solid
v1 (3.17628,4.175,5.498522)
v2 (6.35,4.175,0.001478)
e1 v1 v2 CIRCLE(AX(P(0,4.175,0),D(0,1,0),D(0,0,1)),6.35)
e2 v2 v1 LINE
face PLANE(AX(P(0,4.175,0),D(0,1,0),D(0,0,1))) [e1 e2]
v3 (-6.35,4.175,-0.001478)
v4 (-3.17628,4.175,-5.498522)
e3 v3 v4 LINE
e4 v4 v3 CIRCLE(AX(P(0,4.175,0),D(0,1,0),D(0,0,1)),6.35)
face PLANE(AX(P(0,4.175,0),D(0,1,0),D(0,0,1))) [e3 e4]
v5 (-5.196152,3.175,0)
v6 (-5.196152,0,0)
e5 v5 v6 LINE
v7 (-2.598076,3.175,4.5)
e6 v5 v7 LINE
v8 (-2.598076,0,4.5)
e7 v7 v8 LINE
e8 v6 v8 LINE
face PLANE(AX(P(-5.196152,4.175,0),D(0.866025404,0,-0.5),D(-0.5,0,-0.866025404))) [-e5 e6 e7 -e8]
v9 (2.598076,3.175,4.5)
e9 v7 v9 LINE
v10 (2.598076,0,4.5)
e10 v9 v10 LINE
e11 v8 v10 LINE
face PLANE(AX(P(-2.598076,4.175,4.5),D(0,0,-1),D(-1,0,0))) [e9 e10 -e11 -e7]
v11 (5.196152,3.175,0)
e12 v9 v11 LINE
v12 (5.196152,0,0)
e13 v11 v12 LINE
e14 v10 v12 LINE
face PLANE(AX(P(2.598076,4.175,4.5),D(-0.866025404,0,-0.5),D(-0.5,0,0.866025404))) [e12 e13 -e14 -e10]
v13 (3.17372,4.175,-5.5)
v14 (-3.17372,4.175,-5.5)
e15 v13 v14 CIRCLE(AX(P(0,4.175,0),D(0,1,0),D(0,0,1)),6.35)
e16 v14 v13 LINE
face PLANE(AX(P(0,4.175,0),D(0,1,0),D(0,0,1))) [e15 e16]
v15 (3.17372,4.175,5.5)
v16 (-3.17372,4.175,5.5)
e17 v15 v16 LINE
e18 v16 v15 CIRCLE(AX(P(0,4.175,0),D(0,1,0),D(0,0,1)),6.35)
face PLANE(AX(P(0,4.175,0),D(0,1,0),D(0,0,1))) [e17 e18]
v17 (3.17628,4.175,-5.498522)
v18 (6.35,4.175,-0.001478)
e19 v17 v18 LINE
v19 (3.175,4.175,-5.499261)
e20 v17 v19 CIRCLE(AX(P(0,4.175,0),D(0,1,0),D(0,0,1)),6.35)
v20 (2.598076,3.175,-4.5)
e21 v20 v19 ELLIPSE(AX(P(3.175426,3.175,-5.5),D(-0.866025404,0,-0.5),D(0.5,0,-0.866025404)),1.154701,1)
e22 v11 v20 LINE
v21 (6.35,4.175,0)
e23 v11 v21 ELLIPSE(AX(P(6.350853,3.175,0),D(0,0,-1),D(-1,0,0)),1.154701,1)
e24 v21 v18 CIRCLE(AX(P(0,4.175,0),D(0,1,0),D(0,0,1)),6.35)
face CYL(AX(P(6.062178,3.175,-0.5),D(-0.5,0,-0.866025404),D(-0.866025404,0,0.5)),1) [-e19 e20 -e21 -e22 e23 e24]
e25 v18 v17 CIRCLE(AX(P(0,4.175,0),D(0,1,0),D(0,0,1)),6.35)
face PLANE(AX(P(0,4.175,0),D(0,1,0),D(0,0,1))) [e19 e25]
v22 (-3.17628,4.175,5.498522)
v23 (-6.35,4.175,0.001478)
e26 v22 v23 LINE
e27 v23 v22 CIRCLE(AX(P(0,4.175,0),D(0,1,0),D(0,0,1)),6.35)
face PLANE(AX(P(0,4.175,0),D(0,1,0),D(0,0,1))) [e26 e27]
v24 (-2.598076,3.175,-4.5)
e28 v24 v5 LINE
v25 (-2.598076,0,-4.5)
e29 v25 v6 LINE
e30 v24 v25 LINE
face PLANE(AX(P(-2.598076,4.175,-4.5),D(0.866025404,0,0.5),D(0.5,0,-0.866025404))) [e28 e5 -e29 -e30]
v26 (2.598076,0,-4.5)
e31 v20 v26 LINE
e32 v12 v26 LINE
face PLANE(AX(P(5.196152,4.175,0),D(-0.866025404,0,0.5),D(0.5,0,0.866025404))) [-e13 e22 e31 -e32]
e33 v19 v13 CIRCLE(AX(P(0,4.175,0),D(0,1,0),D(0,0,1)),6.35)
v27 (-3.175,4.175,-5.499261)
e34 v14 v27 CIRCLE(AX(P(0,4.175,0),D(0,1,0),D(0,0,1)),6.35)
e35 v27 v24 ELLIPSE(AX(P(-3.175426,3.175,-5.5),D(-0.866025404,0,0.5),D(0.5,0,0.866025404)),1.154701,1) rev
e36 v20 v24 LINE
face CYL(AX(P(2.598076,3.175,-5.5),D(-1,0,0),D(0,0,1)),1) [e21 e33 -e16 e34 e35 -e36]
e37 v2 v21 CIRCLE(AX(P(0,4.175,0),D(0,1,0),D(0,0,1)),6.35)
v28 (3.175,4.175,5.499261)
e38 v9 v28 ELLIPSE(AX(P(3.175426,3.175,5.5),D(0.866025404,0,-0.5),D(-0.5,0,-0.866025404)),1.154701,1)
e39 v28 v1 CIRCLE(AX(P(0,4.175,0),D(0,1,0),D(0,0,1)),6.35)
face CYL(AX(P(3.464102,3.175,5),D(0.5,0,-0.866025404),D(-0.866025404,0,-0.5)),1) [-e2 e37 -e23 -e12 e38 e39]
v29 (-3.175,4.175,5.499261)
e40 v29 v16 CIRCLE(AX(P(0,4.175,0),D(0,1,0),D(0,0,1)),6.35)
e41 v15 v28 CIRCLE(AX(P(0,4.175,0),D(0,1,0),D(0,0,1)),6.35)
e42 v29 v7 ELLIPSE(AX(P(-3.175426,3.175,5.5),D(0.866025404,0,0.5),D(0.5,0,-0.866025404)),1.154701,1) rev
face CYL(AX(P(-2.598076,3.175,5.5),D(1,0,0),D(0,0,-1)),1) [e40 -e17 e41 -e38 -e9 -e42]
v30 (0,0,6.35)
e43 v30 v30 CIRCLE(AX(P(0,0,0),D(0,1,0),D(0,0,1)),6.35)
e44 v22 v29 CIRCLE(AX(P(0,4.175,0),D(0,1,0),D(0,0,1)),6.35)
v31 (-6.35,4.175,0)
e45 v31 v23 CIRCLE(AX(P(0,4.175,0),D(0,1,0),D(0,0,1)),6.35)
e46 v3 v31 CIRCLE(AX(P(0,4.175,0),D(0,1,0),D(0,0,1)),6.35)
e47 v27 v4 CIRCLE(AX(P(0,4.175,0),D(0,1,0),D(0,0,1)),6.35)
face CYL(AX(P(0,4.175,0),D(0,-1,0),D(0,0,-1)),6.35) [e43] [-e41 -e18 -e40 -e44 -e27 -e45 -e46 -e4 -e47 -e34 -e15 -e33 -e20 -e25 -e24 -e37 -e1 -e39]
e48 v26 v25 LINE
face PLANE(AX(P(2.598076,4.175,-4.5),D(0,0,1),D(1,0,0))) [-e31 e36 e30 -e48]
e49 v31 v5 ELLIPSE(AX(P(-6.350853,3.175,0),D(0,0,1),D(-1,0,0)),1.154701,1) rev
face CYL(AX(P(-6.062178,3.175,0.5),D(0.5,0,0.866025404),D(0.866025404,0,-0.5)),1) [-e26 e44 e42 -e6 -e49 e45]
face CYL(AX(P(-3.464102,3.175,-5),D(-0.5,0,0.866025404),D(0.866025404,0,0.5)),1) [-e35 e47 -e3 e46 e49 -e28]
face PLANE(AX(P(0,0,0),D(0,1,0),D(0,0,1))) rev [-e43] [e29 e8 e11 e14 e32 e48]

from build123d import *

# Parameters (mm, degrees)
SKETCH1_R           = 6.35
BOSS_EXTRUDE1_DEPTH = 4.175
FILLET1_R           = 1


with BuildPart() as part:
    # Sketch1 → Boss-Extrude1 (new body)
    with BuildSketch(Plane(origin=(0, 0, 0), x_dir=(1, 0, 0), z_dir=(0, 1, 0))):
        with Locations(Location((0, 0, 0), (0, 0, 270))):
            Circle(SKETCH1_R)
        Polygon((5.196152423, 0), (2.598076211, 4.5), (-2.598076211, 4.5), (-5.196152423, 0), (-2.598076211, -4.5), (2.598076211, -4.5), align=None, mode=Mode.SUBTRACT)
    extrude(amount=BOSS_EXTRUDE1_DEPTH)

    # Fillet1
    # the kernel refuses this fillet: 1 mm, written as the material it takes off along each edge
    with BuildSketch(Plane(origin=(1.348076211, 4.175, 6.665063509), x_dir=(0, -1, 0), z_dir=(0.4999999999999997, 0, -0.8660254037844388))) as fillet1_piece_1_section:
        with BuildLine():
            CenterArc((FILLET1_R, -FILLET1_R), FILLET1_R, 90, 90)
            Line((0, -FILLET1_R), (-FILLET1_R * 0.02, -FILLET1_R))
            Line((-FILLET1_R * 0.02, -FILLET1_R), (-FILLET1_R * 0.02, FILLET1_R * 0.02))
            Line((-FILLET1_R * 0.02, FILLET1_R * 0.02), (FILLET1_R, FILLET1_R * 0.02))
            Line((FILLET1_R, FILLET1_R * 0.02), (FILLET1_R, 0))
        make_face()
    fillet1_piece_1 = extrude(amount=10.196152423, mode=Mode.PRIVATE)
    fillet1_piece_1 = split(fillet1_piece_1, bisect_by=Plane(origin=(4.083759971, 3.942180167, 4.5), z_dir=(0, 0, -1)), keep=Keep.TOP, mode=Mode.PRIVATE)
    fillet1_piece_1 = split(fillet1_piece_1, bisect_by=Plane(origin=(5.938994303, 3.942180167, 1.286639878), z_dir=(-0.8660254037844387, 0, 0.49999999999999983)), keep=Keep.TOP, mode=Mode.PRIVATE)
    add(fillet1_piece_1, mode=Mode.SUBTRACT)
    with BuildSketch(Plane(origin=(6.446152423, 4.175, 2.165063509), x_dir=(0, -1, 0), z_dir=(-0.4999999999999999, 0, -0.8660254037844388))) as fillet1_piece_2_section:
        with BuildLine():
            CenterArc((FILLET1_R, -FILLET1_R), FILLET1_R, 90, 90)
            Line((0, -FILLET1_R), (-FILLET1_R * 0.02, -FILLET1_R))
            Line((-FILLET1_R * 0.02, -FILLET1_R), (-FILLET1_R * 0.02, FILLET1_R * 0.02))
            Line((-FILLET1_R * 0.02, FILLET1_R * 0.02), (FILLET1_R, FILLET1_R * 0.02))
            Line((FILLET1_R, FILLET1_R * 0.02), (FILLET1_R, 0))
        make_face()
    fillet1_piece_2 = extrude(amount=10.196152423, mode=Mode.PRIVATE)
    fillet1_piece_2 = split(fillet1_piece_2, bisect_by=Plane(origin=(5.938994303, 3.942180167, -1.286639878), z_dir=(-0.8660254037844388, 0, -0.4999999999999997)), keep=Keep.TOP, mode=Mode.PRIVATE)
    fillet1_piece_2 = split(fillet1_piece_2, bisect_by=Plane(origin=(4.083759971, 3.942180167, -4.5), z_dir=(0, 0, 1)), keep=Keep.TOP, mode=Mode.PRIVATE)
    add(fillet1_piece_2, mode=Mode.SUBTRACT)
    with BuildSketch(Plane(origin=(5.098076211, 4.175, -4.5), x_dir=(0, -1, 0), z_dir=(-1, 0, 0))) as fillet1_piece_3_section:
        with BuildLine():
            CenterArc((FILLET1_R, -FILLET1_R), FILLET1_R, 90, 90)
            Line((0, -FILLET1_R), (-FILLET1_R * 0.02, -FILLET1_R))
            Line((-FILLET1_R * 0.02, -FILLET1_R), (-FILLET1_R * 0.02, FILLET1_R * 0.02))
            Line((-FILLET1_R * 0.02, FILLET1_R * 0.02), (FILLET1_R, FILLET1_R * 0.02))
            Line((FILLET1_R, FILLET1_R * 0.02), (FILLET1_R, 0))
        make_face()
    fillet1_piece_3 = extrude(amount=10.196152423, mode=Mode.PRIVATE)
    fillet1_piece_3 = split(fillet1_piece_3, bisect_by=Plane(origin=(-1.855234331, 3.942180167, -5.786639878), z_dir=(0.8660254037844387, 0, 0.4999999999999999)), keep=Keep.TOP, mode=Mode.PRIVATE)
    fillet1_piece_3 = split(fillet1_piece_3, bisect_by=Plane(origin=(1.855234331, 3.942180167, -5.786639878), z_dir=(-0.8660254037844387, 0, 0.49999999999999983)), keep=Keep.TOP, mode=Mode.PRIVATE)
    add(fillet1_piece_3, mode=Mode.SUBTRACT)
    with BuildSketch(Plane(origin=(-1.348076211, 4.175, -6.665063509), x_dir=(0, -1, 0), z_dir=(-0.4999999999999999, 0, 0.8660254037844387))) as fillet1_piece_4_section:
        with BuildLine():
            CenterArc((FILLET1_R, -FILLET1_R), FILLET1_R, 90, 90)
            Line((0, -FILLET1_R), (-FILLET1_R * 0.02, -FILLET1_R))
            Line((-FILLET1_R * 0.02, -FILLET1_R), (-FILLET1_R * 0.02, FILLET1_R * 0.02))
            Line((-FILLET1_R * 0.02, FILLET1_R * 0.02), (FILLET1_R, FILLET1_R * 0.02))
            Line((FILLET1_R, FILLET1_R * 0.02), (FILLET1_R, 0))
        make_face()
    fillet1_piece_4 = extrude(amount=10.196152423, mode=Mode.PRIVATE)
    fillet1_piece_4 = split(fillet1_piece_4, bisect_by=Plane(origin=(-5.938994303, 3.942180167, -1.286639878), z_dir=(0.8660254037844388, 0, -0.4999999999999998)), keep=Keep.TOP, mode=Mode.PRIVATE)
    fillet1_piece_4 = split(fillet1_piece_4, bisect_by=Plane(origin=(-4.083759971, 3.942180167, -4.5), z_dir=(0, 0, 1)), keep=Keep.TOP, mode=Mode.PRIVATE)
    add(fillet1_piece_4, mode=Mode.SUBTRACT)
    with BuildSketch(Plane(origin=(-6.446152423, 4.175, -2.165063509), x_dir=(0, -1, 0), z_dir=(0.4999999999999998, 0, 0.8660254037844388))) as fillet1_piece_5_section:
        with BuildLine():
            CenterArc((FILLET1_R, -FILLET1_R), FILLET1_R, 90, 90)
            Line((0, -FILLET1_R), (-FILLET1_R * 0.02, -FILLET1_R))
            Line((-FILLET1_R * 0.02, -FILLET1_R), (-FILLET1_R * 0.02, FILLET1_R * 0.02))
            Line((-FILLET1_R * 0.02, FILLET1_R * 0.02), (FILLET1_R, FILLET1_R * 0.02))
            Line((FILLET1_R, FILLET1_R * 0.02), (FILLET1_R, 0))
        make_face()
    fillet1_piece_5 = extrude(amount=10.196152423, mode=Mode.PRIVATE)
    fillet1_piece_5 = split(fillet1_piece_5, bisect_by=Plane(origin=(-4.083759971, 3.942180167, 4.5), z_dir=(0, 0, -1)), keep=Keep.TOP, mode=Mode.PRIVATE)
    fillet1_piece_5 = split(fillet1_piece_5, bisect_by=Plane(origin=(-5.938994303, 3.942180167, 1.286639878), z_dir=(0.8660254037844387, 0, 0.4999999999999999)), keep=Keep.TOP, mode=Mode.PRIVATE)
    add(fillet1_piece_5, mode=Mode.SUBTRACT)
    with BuildSketch(Plane(origin=(-5.098076211, 4.175, 4.5), x_dir=(0, -1, 0), z_dir=(1, 0, 0))) as fillet1_piece_6_section:
        with BuildLine():
            CenterArc((FILLET1_R, -FILLET1_R), FILLET1_R, 90, 90)
            Line((0, -FILLET1_R), (-FILLET1_R * 0.02, -FILLET1_R))
            Line((-FILLET1_R * 0.02, -FILLET1_R), (-FILLET1_R * 0.02, FILLET1_R * 0.02))
            Line((-FILLET1_R * 0.02, FILLET1_R * 0.02), (FILLET1_R, FILLET1_R * 0.02))
            Line((FILLET1_R, FILLET1_R * 0.02), (FILLET1_R, 0))
        make_face()
    fillet1_piece_6 = extrude(amount=10.196152423, mode=Mode.PRIVATE)
    fillet1_piece_6 = split(fillet1_piece_6, bisect_by=Plane(origin=(1.855234331, 3.942180167, 5.786639878), z_dir=(-0.8660254037844388, 0, -0.4999999999999997)), keep=Keep.TOP, mode=Mode.PRIVATE)
    fillet1_piece_6 = split(fillet1_piece_6, bisect_by=Plane(origin=(-1.855234331, 3.942180167, 5.786639878), z_dir=(0.8660254037844388, 0, -0.4999999999999998)), keep=Keep.TOP, mode=Mode.PRIVATE)
    add(fillet1_piece_6, mode=Mode.SUBTRACT)
    with BuildSketch(Plane(origin=(1.348076211, 4.175, 6.665063509), x_dir=(0, -1, 0), z_dir=(0.4999999999999997, 0, -0.8660254037844388))) as fillet1_piece_7a_section:
        with BuildLine():
            CenterArc((FILLET1_R, -FILLET1_R), FILLET1_R, 90, 90)
            Line((0, -FILLET1_R), (-FILLET1_R * 0.02, -FILLET1_R))
            Line((-FILLET1_R * 0.02, -FILLET1_R), (-FILLET1_R * 0.02, FILLET1_R * 0.02))
            Line((-FILLET1_R * 0.02, FILLET1_R * 0.02), (FILLET1_R, FILLET1_R * 0.02))
            Line((FILLET1_R, FILLET1_R * 0.02), (FILLET1_R, 0))
        make_face()
    fillet1_piece_7a = extrude(amount=10.196152423, mode=Mode.PRIVATE)
    fillet1_piece_7a = split(fillet1_piece_7a, bisect_by=Plane(origin=(2.212123178, 3.95463069, 4.5), z_dir=(0, 0, 1)), keep=Keep.TOP, mode=Mode.PRIVATE)
    with BuildSketch(Plane(origin=(-5.098076211, 4.175, 4.5), x_dir=(0, -1, 0), z_dir=(1, 0, 0))) as fillet1_piece_7b_section:
        with BuildLine():
            CenterArc((FILLET1_R, -FILLET1_R), FILLET1_R, 90, 90)
            Line((0, -FILLET1_R), (-FILLET1_R * 0.02, -FILLET1_R))
            Line((-FILLET1_R * 0.02, -FILLET1_R), (-FILLET1_R * 0.02, FILLET1_R * 0.02))
            Line((-FILLET1_R * 0.02, FILLET1_R * 0.02), (FILLET1_R, FILLET1_R * 0.02))
            Line((FILLET1_R, FILLET1_R * 0.02), (FILLET1_R, 0))
        make_face()
    fillet1_piece_7b = extrude(amount=10.196152423, mode=Mode.PRIVATE)
    fillet1_piece_7b = split(fillet1_piece_7b, bisect_by=Plane(origin=(2.791052728, 3.95463069, 4.165754869), z_dir=(0.8660254037844388, 0, 0.4999999999999997)), keep=Keep.TOP, mode=Mode.PRIVATE)
    fillet1_piece_7 = fillet1_piece_7a & fillet1_piece_7b
    add(fillet1_piece_7, mode=Mode.SUBTRACT)
    with BuildSketch(Plane(origin=(1.348076211, 4.175, 6.665063509), x_dir=(0, -1, 0), z_dir=(0.4999999999999997, 0, -0.8660254037844388))) as fillet1_piece_8a_section:
        with BuildLine():
            CenterArc((FILLET1_R, -FILLET1_R), FILLET1_R, 90, 90)
            Line((0, -FILLET1_R), (-FILLET1_R * 0.02, -FILLET1_R))
            Line((-FILLET1_R * 0.02, -FILLET1_R), (-FILLET1_R * 0.02, FILLET1_R * 0.02))
            Line((-FILLET1_R * 0.02, FILLET1_R * 0.02), (FILLET1_R, FILLET1_R * 0.02))
            Line((FILLET1_R, FILLET1_R * 0.02), (FILLET1_R, 0))
        make_face()
    fillet1_piece_8a = extrude(amount=10.196152423, mode=Mode.PRIVATE)
    fillet1_piece_8a = split(fillet1_piece_8a, bisect_by=Plane(origin=(5.003175906, 3.95463069, -0.334245131), z_dir=(0.8660254037844387, 0, -0.49999999999999983)), keep=Keep.TOP, mode=Mode.PRIVATE)
    with BuildSketch(Plane(origin=(6.446152423, 4.175, 2.165063509), x_dir=(0, -1, 0), z_dir=(-0.4999999999999999, 0, -0.8660254037844388))) as fillet1_piece_8b_section:
        with BuildLine():
            CenterArc((FILLET1_R, -FILLET1_R), FILLET1_R, 90, 90)
            Line((0, -FILLET1_R), (-FILLET1_R * 0.02, -FILLET1_R))
            Line((-FILLET1_R * 0.02, -FILLET1_R), (-FILLET1_R * 0.02, FILLET1_R * 0.02))
            Line((-FILLET1_R * 0.02, FILLET1_R * 0.02), (FILLET1_R, FILLET1_R * 0.02))
            Line((FILLET1_R, FILLET1_R * 0.02), (FILLET1_R, 0))
        make_face()
    fillet1_piece_8b = extrude(amount=10.196152423, mode=Mode.PRIVATE)
    fillet1_piece_8b = split(fillet1_piece_8b, bisect_by=Plane(origin=(5.003175906, 3.95463069, 0.334245131), z_dir=(0.8660254037844388, 0, 0.4999999999999997)), keep=Keep.TOP, mode=Mode.PRIVATE)
    fillet1_piece_8 = fillet1_piece_8a & fillet1_piece_8b
    add(fillet1_piece_8, mode=Mode.SUBTRACT)
    with BuildSketch(Plane(origin=(5.098076211, 4.175, -4.5), x_dir=(0, -1, 0), z_dir=(-1, 0, 0))) as fillet1_piece_9a_section:
        with BuildLine():
            CenterArc((FILLET1_R, -FILLET1_R), FILLET1_R, 90, 90)
            Line((0, -FILLET1_R), (-FILLET1_R * 0.02, -FILLET1_R))
            Line((-FILLET1_R * 0.02, -FILLET1_R), (-FILLET1_R * 0.02, FILLET1_R * 0.02))
            Line((-FILLET1_R * 0.02, FILLET1_R * 0.02), (FILLET1_R, FILLET1_R * 0.02))
            Line((FILLET1_R, FILLET1_R * 0.02), (FILLET1_R, 0))
        make_face()
    fillet1_piece_9a = extrude(amount=10.196152423, mode=Mode.PRIVATE)
    fillet1_piece_9a = split(fillet1_piece_9a, bisect_by=Plane(origin=(2.791052728, 3.95463069, -4.165754869), z_dir=(0.8660254037844387, 0, -0.49999999999999983)), keep=Keep.TOP, mode=Mode.PRIVATE)
    with BuildSketch(Plane(origin=(6.446152423, 4.175, 2.165063509), x_dir=(0, -1, 0), z_dir=(-0.4999999999999999, 0, -0.8660254037844388))) as fillet1_piece_9b_section:
        with BuildLine():
            CenterArc((FILLET1_R, -FILLET1_R), FILLET1_R, 90, 90)
            Line((0, -FILLET1_R), (-FILLET1_R * 0.02, -FILLET1_R))
            Line((-FILLET1_R * 0.02, -FILLET1_R), (-FILLET1_R * 0.02, FILLET1_R * 0.02))
            Line((-FILLET1_R * 0.02, FILLET1_R * 0.02), (FILLET1_R, FILLET1_R * 0.02))
            Line((FILLET1_R, FILLET1_R * 0.02), (FILLET1_R, 0))
        make_face()
    fillet1_piece_9b = extrude(amount=10.196152423, mode=Mode.PRIVATE)
    fillet1_piece_9b = split(fillet1_piece_9b, bisect_by=Plane(origin=(2.212123178, 3.95463069, -4.5), z_dir=(0, 0, -1)), keep=Keep.TOP, mode=Mode.PRIVATE)
    fillet1_piece_9 = fillet1_piece_9a & fillet1_piece_9b
    add(fillet1_piece_9, mode=Mode.SUBTRACT)
    with BuildSketch(Plane(origin=(-1.348076211, 4.175, -6.665063509), x_dir=(0, -1, 0), z_dir=(-0.4999999999999999, 0, 0.8660254037844387))) as fillet1_piece_10a_section:
        with BuildLine():
            CenterArc((FILLET1_R, -FILLET1_R), FILLET1_R, 90, 90)
            Line((0, -FILLET1_R), (-FILLET1_R * 0.02, -FILLET1_R))
            Line((-FILLET1_R * 0.02, -FILLET1_R), (-FILLET1_R * 0.02, FILLET1_R * 0.02))
            Line((-FILLET1_R * 0.02, FILLET1_R * 0.02), (FILLET1_R, FILLET1_R * 0.02))
            Line((FILLET1_R, FILLET1_R * 0.02), (FILLET1_R, 0))
        make_face()
    fillet1_piece_10a = extrude(amount=10.196152423, mode=Mode.PRIVATE)
    fillet1_piece_10a = split(fillet1_piece_10a, bisect_by=Plane(origin=(-2.212123178, 3.95463069, -4.5), z_dir=(0, 0, -1)), keep=Keep.TOP, mode=Mode.PRIVATE)
    with BuildSketch(Plane(origin=(5.098076211, 4.175, -4.5), x_dir=(0, -1, 0), z_dir=(-1, 0, 0))) as fillet1_piece_10b_section:
        with BuildLine():
            CenterArc((FILLET1_R, -FILLET1_R), FILLET1_R, 90, 90)
            Line((0, -FILLET1_R), (-FILLET1_R * 0.02, -FILLET1_R))
            Line((-FILLET1_R * 0.02, -FILLET1_R), (-FILLET1_R * 0.02, FILLET1_R * 0.02))
            Line((-FILLET1_R * 0.02, FILLET1_R * 0.02), (FILLET1_R, FILLET1_R * 0.02))
            Line((FILLET1_R, FILLET1_R * 0.02), (FILLET1_R, 0))
        make_face()
    fillet1_piece_10b = extrude(amount=10.196152423, mode=Mode.PRIVATE)
    fillet1_piece_10b = split(fillet1_piece_10b, bisect_by=Plane(origin=(-2.791052728, 3.95463069, -4.165754869), z_dir=(-0.8660254037844387, 0, -0.4999999999999999)), keep=Keep.TOP, mode=Mode.PRIVATE)
    fillet1_piece_10 = fillet1_piece_10a & fillet1_piece_10b
    add(fillet1_piece_10, mode=Mode.SUBTRACT)
    with BuildSketch(Plane(origin=(-6.446152423, 4.175, -2.165063509), x_dir=(0, -1, 0), z_dir=(0.4999999999999998, 0, 0.8660254037844388))) as fillet1_piece_11a_section:
        with BuildLine():
            CenterArc((FILLET1_R, -FILLET1_R), FILLET1_R, 90, 90)
            Line((0, -FILLET1_R), (-FILLET1_R * 0.02, -FILLET1_R))
            Line((-FILLET1_R * 0.02, -FILLET1_R), (-FILLET1_R * 0.02, FILLET1_R * 0.02))
            Line((-FILLET1_R * 0.02, FILLET1_R * 0.02), (FILLET1_R, FILLET1_R * 0.02))
            Line((FILLET1_R, FILLET1_R * 0.02), (FILLET1_R, 0))
        make_face()
    fillet1_piece_11a = extrude(amount=10.196152423, mode=Mode.PRIVATE)
    fillet1_piece_11a = split(fillet1_piece_11a, bisect_by=Plane(origin=(-5.003175906, 3.95463069, -0.334245131), z_dir=(-0.8660254037844387, 0, -0.4999999999999999)), keep=Keep.TOP, mode=Mode.PRIVATE)
    with BuildSketch(Plane(origin=(-1.348076211, 4.175, -6.665063509), x_dir=(0, -1, 0), z_dir=(-0.4999999999999999, 0, 0.8660254037844387))) as fillet1_piece_11b_section:
        with BuildLine():
            CenterArc((FILLET1_R, -FILLET1_R), FILLET1_R, 90, 90)
            Line((0, -FILLET1_R), (-FILLET1_R * 0.02, -FILLET1_R))
            Line((-FILLET1_R * 0.02, -FILLET1_R), (-FILLET1_R * 0.02, FILLET1_R * 0.02))
            Line((-FILLET1_R * 0.02, FILLET1_R * 0.02), (FILLET1_R, FILLET1_R * 0.02))
            Line((FILLET1_R, FILLET1_R * 0.02), (FILLET1_R, 0))
        make_face()
    fillet1_piece_11b = extrude(amount=10.196152423, mode=Mode.PRIVATE)
    fillet1_piece_11b = split(fillet1_piece_11b, bisect_by=Plane(origin=(-5.003175906, 3.95463069, 0.334245131), z_dir=(-0.8660254037844388, 0, 0.4999999999999998)), keep=Keep.TOP, mode=Mode.PRIVATE)
    fillet1_piece_11 = fillet1_piece_11a & fillet1_piece_11b
    add(fillet1_piece_11, mode=Mode.SUBTRACT)
    with BuildSketch(Plane(origin=(-5.098076211, 4.175, 4.5), x_dir=(0, -1, 0), z_dir=(1, 0, 0))) as fillet1_piece_12a_section:
        with BuildLine():
            CenterArc((FILLET1_R, -FILLET1_R), FILLET1_R, 90, 90)
            Line((0, -FILLET1_R), (-FILLET1_R * 0.02, -FILLET1_R))
            Line((-FILLET1_R * 0.02, -FILLET1_R), (-FILLET1_R * 0.02, FILLET1_R * 0.02))
            Line((-FILLET1_R * 0.02, FILLET1_R * 0.02), (FILLET1_R, FILLET1_R * 0.02))
            Line((FILLET1_R, FILLET1_R * 0.02), (FILLET1_R, 0))
        make_face()
    fillet1_piece_12a = extrude(amount=10.196152423, mode=Mode.PRIVATE)
    fillet1_piece_12a = split(fillet1_piece_12a, bisect_by=Plane(origin=(-2.791052728, 3.95463069, 4.165754869), z_dir=(-0.8660254037844388, 0, 0.4999999999999998)), keep=Keep.TOP, mode=Mode.PRIVATE)
    with BuildSketch(Plane(origin=(-6.446152423, 4.175, -2.165063509), x_dir=(0, -1, 0), z_dir=(0.4999999999999998, 0, 0.8660254037844388))) as fillet1_piece_12b_section:
        with BuildLine():
            CenterArc((FILLET1_R, -FILLET1_R), FILLET1_R, 90, 90)
            Line((0, -FILLET1_R), (-FILLET1_R * 0.02, -FILLET1_R))
            Line((-FILLET1_R * 0.02, -FILLET1_R), (-FILLET1_R * 0.02, FILLET1_R * 0.02))
            Line((-FILLET1_R * 0.02, FILLET1_R * 0.02), (FILLET1_R, FILLET1_R * 0.02))
            Line((FILLET1_R, FILLET1_R * 0.02), (FILLET1_R, 0))
        make_face()
    fillet1_piece_12b = extrude(amount=10.196152423, mode=Mode.PRIVATE)
    fillet1_piece_12b = split(fillet1_piece_12b, bisect_by=Plane(origin=(-2.212123178, 3.95463069, 4.5), z_dir=(0, 0, 1)), keep=Keep.TOP, mode=Mode.PRIVATE)
    fillet1_piece_12 = fillet1_piece_12a & fillet1_piece_12b
    add(fillet1_piece_12, mode=Mode.SUBTRACT)


solid = part.part
